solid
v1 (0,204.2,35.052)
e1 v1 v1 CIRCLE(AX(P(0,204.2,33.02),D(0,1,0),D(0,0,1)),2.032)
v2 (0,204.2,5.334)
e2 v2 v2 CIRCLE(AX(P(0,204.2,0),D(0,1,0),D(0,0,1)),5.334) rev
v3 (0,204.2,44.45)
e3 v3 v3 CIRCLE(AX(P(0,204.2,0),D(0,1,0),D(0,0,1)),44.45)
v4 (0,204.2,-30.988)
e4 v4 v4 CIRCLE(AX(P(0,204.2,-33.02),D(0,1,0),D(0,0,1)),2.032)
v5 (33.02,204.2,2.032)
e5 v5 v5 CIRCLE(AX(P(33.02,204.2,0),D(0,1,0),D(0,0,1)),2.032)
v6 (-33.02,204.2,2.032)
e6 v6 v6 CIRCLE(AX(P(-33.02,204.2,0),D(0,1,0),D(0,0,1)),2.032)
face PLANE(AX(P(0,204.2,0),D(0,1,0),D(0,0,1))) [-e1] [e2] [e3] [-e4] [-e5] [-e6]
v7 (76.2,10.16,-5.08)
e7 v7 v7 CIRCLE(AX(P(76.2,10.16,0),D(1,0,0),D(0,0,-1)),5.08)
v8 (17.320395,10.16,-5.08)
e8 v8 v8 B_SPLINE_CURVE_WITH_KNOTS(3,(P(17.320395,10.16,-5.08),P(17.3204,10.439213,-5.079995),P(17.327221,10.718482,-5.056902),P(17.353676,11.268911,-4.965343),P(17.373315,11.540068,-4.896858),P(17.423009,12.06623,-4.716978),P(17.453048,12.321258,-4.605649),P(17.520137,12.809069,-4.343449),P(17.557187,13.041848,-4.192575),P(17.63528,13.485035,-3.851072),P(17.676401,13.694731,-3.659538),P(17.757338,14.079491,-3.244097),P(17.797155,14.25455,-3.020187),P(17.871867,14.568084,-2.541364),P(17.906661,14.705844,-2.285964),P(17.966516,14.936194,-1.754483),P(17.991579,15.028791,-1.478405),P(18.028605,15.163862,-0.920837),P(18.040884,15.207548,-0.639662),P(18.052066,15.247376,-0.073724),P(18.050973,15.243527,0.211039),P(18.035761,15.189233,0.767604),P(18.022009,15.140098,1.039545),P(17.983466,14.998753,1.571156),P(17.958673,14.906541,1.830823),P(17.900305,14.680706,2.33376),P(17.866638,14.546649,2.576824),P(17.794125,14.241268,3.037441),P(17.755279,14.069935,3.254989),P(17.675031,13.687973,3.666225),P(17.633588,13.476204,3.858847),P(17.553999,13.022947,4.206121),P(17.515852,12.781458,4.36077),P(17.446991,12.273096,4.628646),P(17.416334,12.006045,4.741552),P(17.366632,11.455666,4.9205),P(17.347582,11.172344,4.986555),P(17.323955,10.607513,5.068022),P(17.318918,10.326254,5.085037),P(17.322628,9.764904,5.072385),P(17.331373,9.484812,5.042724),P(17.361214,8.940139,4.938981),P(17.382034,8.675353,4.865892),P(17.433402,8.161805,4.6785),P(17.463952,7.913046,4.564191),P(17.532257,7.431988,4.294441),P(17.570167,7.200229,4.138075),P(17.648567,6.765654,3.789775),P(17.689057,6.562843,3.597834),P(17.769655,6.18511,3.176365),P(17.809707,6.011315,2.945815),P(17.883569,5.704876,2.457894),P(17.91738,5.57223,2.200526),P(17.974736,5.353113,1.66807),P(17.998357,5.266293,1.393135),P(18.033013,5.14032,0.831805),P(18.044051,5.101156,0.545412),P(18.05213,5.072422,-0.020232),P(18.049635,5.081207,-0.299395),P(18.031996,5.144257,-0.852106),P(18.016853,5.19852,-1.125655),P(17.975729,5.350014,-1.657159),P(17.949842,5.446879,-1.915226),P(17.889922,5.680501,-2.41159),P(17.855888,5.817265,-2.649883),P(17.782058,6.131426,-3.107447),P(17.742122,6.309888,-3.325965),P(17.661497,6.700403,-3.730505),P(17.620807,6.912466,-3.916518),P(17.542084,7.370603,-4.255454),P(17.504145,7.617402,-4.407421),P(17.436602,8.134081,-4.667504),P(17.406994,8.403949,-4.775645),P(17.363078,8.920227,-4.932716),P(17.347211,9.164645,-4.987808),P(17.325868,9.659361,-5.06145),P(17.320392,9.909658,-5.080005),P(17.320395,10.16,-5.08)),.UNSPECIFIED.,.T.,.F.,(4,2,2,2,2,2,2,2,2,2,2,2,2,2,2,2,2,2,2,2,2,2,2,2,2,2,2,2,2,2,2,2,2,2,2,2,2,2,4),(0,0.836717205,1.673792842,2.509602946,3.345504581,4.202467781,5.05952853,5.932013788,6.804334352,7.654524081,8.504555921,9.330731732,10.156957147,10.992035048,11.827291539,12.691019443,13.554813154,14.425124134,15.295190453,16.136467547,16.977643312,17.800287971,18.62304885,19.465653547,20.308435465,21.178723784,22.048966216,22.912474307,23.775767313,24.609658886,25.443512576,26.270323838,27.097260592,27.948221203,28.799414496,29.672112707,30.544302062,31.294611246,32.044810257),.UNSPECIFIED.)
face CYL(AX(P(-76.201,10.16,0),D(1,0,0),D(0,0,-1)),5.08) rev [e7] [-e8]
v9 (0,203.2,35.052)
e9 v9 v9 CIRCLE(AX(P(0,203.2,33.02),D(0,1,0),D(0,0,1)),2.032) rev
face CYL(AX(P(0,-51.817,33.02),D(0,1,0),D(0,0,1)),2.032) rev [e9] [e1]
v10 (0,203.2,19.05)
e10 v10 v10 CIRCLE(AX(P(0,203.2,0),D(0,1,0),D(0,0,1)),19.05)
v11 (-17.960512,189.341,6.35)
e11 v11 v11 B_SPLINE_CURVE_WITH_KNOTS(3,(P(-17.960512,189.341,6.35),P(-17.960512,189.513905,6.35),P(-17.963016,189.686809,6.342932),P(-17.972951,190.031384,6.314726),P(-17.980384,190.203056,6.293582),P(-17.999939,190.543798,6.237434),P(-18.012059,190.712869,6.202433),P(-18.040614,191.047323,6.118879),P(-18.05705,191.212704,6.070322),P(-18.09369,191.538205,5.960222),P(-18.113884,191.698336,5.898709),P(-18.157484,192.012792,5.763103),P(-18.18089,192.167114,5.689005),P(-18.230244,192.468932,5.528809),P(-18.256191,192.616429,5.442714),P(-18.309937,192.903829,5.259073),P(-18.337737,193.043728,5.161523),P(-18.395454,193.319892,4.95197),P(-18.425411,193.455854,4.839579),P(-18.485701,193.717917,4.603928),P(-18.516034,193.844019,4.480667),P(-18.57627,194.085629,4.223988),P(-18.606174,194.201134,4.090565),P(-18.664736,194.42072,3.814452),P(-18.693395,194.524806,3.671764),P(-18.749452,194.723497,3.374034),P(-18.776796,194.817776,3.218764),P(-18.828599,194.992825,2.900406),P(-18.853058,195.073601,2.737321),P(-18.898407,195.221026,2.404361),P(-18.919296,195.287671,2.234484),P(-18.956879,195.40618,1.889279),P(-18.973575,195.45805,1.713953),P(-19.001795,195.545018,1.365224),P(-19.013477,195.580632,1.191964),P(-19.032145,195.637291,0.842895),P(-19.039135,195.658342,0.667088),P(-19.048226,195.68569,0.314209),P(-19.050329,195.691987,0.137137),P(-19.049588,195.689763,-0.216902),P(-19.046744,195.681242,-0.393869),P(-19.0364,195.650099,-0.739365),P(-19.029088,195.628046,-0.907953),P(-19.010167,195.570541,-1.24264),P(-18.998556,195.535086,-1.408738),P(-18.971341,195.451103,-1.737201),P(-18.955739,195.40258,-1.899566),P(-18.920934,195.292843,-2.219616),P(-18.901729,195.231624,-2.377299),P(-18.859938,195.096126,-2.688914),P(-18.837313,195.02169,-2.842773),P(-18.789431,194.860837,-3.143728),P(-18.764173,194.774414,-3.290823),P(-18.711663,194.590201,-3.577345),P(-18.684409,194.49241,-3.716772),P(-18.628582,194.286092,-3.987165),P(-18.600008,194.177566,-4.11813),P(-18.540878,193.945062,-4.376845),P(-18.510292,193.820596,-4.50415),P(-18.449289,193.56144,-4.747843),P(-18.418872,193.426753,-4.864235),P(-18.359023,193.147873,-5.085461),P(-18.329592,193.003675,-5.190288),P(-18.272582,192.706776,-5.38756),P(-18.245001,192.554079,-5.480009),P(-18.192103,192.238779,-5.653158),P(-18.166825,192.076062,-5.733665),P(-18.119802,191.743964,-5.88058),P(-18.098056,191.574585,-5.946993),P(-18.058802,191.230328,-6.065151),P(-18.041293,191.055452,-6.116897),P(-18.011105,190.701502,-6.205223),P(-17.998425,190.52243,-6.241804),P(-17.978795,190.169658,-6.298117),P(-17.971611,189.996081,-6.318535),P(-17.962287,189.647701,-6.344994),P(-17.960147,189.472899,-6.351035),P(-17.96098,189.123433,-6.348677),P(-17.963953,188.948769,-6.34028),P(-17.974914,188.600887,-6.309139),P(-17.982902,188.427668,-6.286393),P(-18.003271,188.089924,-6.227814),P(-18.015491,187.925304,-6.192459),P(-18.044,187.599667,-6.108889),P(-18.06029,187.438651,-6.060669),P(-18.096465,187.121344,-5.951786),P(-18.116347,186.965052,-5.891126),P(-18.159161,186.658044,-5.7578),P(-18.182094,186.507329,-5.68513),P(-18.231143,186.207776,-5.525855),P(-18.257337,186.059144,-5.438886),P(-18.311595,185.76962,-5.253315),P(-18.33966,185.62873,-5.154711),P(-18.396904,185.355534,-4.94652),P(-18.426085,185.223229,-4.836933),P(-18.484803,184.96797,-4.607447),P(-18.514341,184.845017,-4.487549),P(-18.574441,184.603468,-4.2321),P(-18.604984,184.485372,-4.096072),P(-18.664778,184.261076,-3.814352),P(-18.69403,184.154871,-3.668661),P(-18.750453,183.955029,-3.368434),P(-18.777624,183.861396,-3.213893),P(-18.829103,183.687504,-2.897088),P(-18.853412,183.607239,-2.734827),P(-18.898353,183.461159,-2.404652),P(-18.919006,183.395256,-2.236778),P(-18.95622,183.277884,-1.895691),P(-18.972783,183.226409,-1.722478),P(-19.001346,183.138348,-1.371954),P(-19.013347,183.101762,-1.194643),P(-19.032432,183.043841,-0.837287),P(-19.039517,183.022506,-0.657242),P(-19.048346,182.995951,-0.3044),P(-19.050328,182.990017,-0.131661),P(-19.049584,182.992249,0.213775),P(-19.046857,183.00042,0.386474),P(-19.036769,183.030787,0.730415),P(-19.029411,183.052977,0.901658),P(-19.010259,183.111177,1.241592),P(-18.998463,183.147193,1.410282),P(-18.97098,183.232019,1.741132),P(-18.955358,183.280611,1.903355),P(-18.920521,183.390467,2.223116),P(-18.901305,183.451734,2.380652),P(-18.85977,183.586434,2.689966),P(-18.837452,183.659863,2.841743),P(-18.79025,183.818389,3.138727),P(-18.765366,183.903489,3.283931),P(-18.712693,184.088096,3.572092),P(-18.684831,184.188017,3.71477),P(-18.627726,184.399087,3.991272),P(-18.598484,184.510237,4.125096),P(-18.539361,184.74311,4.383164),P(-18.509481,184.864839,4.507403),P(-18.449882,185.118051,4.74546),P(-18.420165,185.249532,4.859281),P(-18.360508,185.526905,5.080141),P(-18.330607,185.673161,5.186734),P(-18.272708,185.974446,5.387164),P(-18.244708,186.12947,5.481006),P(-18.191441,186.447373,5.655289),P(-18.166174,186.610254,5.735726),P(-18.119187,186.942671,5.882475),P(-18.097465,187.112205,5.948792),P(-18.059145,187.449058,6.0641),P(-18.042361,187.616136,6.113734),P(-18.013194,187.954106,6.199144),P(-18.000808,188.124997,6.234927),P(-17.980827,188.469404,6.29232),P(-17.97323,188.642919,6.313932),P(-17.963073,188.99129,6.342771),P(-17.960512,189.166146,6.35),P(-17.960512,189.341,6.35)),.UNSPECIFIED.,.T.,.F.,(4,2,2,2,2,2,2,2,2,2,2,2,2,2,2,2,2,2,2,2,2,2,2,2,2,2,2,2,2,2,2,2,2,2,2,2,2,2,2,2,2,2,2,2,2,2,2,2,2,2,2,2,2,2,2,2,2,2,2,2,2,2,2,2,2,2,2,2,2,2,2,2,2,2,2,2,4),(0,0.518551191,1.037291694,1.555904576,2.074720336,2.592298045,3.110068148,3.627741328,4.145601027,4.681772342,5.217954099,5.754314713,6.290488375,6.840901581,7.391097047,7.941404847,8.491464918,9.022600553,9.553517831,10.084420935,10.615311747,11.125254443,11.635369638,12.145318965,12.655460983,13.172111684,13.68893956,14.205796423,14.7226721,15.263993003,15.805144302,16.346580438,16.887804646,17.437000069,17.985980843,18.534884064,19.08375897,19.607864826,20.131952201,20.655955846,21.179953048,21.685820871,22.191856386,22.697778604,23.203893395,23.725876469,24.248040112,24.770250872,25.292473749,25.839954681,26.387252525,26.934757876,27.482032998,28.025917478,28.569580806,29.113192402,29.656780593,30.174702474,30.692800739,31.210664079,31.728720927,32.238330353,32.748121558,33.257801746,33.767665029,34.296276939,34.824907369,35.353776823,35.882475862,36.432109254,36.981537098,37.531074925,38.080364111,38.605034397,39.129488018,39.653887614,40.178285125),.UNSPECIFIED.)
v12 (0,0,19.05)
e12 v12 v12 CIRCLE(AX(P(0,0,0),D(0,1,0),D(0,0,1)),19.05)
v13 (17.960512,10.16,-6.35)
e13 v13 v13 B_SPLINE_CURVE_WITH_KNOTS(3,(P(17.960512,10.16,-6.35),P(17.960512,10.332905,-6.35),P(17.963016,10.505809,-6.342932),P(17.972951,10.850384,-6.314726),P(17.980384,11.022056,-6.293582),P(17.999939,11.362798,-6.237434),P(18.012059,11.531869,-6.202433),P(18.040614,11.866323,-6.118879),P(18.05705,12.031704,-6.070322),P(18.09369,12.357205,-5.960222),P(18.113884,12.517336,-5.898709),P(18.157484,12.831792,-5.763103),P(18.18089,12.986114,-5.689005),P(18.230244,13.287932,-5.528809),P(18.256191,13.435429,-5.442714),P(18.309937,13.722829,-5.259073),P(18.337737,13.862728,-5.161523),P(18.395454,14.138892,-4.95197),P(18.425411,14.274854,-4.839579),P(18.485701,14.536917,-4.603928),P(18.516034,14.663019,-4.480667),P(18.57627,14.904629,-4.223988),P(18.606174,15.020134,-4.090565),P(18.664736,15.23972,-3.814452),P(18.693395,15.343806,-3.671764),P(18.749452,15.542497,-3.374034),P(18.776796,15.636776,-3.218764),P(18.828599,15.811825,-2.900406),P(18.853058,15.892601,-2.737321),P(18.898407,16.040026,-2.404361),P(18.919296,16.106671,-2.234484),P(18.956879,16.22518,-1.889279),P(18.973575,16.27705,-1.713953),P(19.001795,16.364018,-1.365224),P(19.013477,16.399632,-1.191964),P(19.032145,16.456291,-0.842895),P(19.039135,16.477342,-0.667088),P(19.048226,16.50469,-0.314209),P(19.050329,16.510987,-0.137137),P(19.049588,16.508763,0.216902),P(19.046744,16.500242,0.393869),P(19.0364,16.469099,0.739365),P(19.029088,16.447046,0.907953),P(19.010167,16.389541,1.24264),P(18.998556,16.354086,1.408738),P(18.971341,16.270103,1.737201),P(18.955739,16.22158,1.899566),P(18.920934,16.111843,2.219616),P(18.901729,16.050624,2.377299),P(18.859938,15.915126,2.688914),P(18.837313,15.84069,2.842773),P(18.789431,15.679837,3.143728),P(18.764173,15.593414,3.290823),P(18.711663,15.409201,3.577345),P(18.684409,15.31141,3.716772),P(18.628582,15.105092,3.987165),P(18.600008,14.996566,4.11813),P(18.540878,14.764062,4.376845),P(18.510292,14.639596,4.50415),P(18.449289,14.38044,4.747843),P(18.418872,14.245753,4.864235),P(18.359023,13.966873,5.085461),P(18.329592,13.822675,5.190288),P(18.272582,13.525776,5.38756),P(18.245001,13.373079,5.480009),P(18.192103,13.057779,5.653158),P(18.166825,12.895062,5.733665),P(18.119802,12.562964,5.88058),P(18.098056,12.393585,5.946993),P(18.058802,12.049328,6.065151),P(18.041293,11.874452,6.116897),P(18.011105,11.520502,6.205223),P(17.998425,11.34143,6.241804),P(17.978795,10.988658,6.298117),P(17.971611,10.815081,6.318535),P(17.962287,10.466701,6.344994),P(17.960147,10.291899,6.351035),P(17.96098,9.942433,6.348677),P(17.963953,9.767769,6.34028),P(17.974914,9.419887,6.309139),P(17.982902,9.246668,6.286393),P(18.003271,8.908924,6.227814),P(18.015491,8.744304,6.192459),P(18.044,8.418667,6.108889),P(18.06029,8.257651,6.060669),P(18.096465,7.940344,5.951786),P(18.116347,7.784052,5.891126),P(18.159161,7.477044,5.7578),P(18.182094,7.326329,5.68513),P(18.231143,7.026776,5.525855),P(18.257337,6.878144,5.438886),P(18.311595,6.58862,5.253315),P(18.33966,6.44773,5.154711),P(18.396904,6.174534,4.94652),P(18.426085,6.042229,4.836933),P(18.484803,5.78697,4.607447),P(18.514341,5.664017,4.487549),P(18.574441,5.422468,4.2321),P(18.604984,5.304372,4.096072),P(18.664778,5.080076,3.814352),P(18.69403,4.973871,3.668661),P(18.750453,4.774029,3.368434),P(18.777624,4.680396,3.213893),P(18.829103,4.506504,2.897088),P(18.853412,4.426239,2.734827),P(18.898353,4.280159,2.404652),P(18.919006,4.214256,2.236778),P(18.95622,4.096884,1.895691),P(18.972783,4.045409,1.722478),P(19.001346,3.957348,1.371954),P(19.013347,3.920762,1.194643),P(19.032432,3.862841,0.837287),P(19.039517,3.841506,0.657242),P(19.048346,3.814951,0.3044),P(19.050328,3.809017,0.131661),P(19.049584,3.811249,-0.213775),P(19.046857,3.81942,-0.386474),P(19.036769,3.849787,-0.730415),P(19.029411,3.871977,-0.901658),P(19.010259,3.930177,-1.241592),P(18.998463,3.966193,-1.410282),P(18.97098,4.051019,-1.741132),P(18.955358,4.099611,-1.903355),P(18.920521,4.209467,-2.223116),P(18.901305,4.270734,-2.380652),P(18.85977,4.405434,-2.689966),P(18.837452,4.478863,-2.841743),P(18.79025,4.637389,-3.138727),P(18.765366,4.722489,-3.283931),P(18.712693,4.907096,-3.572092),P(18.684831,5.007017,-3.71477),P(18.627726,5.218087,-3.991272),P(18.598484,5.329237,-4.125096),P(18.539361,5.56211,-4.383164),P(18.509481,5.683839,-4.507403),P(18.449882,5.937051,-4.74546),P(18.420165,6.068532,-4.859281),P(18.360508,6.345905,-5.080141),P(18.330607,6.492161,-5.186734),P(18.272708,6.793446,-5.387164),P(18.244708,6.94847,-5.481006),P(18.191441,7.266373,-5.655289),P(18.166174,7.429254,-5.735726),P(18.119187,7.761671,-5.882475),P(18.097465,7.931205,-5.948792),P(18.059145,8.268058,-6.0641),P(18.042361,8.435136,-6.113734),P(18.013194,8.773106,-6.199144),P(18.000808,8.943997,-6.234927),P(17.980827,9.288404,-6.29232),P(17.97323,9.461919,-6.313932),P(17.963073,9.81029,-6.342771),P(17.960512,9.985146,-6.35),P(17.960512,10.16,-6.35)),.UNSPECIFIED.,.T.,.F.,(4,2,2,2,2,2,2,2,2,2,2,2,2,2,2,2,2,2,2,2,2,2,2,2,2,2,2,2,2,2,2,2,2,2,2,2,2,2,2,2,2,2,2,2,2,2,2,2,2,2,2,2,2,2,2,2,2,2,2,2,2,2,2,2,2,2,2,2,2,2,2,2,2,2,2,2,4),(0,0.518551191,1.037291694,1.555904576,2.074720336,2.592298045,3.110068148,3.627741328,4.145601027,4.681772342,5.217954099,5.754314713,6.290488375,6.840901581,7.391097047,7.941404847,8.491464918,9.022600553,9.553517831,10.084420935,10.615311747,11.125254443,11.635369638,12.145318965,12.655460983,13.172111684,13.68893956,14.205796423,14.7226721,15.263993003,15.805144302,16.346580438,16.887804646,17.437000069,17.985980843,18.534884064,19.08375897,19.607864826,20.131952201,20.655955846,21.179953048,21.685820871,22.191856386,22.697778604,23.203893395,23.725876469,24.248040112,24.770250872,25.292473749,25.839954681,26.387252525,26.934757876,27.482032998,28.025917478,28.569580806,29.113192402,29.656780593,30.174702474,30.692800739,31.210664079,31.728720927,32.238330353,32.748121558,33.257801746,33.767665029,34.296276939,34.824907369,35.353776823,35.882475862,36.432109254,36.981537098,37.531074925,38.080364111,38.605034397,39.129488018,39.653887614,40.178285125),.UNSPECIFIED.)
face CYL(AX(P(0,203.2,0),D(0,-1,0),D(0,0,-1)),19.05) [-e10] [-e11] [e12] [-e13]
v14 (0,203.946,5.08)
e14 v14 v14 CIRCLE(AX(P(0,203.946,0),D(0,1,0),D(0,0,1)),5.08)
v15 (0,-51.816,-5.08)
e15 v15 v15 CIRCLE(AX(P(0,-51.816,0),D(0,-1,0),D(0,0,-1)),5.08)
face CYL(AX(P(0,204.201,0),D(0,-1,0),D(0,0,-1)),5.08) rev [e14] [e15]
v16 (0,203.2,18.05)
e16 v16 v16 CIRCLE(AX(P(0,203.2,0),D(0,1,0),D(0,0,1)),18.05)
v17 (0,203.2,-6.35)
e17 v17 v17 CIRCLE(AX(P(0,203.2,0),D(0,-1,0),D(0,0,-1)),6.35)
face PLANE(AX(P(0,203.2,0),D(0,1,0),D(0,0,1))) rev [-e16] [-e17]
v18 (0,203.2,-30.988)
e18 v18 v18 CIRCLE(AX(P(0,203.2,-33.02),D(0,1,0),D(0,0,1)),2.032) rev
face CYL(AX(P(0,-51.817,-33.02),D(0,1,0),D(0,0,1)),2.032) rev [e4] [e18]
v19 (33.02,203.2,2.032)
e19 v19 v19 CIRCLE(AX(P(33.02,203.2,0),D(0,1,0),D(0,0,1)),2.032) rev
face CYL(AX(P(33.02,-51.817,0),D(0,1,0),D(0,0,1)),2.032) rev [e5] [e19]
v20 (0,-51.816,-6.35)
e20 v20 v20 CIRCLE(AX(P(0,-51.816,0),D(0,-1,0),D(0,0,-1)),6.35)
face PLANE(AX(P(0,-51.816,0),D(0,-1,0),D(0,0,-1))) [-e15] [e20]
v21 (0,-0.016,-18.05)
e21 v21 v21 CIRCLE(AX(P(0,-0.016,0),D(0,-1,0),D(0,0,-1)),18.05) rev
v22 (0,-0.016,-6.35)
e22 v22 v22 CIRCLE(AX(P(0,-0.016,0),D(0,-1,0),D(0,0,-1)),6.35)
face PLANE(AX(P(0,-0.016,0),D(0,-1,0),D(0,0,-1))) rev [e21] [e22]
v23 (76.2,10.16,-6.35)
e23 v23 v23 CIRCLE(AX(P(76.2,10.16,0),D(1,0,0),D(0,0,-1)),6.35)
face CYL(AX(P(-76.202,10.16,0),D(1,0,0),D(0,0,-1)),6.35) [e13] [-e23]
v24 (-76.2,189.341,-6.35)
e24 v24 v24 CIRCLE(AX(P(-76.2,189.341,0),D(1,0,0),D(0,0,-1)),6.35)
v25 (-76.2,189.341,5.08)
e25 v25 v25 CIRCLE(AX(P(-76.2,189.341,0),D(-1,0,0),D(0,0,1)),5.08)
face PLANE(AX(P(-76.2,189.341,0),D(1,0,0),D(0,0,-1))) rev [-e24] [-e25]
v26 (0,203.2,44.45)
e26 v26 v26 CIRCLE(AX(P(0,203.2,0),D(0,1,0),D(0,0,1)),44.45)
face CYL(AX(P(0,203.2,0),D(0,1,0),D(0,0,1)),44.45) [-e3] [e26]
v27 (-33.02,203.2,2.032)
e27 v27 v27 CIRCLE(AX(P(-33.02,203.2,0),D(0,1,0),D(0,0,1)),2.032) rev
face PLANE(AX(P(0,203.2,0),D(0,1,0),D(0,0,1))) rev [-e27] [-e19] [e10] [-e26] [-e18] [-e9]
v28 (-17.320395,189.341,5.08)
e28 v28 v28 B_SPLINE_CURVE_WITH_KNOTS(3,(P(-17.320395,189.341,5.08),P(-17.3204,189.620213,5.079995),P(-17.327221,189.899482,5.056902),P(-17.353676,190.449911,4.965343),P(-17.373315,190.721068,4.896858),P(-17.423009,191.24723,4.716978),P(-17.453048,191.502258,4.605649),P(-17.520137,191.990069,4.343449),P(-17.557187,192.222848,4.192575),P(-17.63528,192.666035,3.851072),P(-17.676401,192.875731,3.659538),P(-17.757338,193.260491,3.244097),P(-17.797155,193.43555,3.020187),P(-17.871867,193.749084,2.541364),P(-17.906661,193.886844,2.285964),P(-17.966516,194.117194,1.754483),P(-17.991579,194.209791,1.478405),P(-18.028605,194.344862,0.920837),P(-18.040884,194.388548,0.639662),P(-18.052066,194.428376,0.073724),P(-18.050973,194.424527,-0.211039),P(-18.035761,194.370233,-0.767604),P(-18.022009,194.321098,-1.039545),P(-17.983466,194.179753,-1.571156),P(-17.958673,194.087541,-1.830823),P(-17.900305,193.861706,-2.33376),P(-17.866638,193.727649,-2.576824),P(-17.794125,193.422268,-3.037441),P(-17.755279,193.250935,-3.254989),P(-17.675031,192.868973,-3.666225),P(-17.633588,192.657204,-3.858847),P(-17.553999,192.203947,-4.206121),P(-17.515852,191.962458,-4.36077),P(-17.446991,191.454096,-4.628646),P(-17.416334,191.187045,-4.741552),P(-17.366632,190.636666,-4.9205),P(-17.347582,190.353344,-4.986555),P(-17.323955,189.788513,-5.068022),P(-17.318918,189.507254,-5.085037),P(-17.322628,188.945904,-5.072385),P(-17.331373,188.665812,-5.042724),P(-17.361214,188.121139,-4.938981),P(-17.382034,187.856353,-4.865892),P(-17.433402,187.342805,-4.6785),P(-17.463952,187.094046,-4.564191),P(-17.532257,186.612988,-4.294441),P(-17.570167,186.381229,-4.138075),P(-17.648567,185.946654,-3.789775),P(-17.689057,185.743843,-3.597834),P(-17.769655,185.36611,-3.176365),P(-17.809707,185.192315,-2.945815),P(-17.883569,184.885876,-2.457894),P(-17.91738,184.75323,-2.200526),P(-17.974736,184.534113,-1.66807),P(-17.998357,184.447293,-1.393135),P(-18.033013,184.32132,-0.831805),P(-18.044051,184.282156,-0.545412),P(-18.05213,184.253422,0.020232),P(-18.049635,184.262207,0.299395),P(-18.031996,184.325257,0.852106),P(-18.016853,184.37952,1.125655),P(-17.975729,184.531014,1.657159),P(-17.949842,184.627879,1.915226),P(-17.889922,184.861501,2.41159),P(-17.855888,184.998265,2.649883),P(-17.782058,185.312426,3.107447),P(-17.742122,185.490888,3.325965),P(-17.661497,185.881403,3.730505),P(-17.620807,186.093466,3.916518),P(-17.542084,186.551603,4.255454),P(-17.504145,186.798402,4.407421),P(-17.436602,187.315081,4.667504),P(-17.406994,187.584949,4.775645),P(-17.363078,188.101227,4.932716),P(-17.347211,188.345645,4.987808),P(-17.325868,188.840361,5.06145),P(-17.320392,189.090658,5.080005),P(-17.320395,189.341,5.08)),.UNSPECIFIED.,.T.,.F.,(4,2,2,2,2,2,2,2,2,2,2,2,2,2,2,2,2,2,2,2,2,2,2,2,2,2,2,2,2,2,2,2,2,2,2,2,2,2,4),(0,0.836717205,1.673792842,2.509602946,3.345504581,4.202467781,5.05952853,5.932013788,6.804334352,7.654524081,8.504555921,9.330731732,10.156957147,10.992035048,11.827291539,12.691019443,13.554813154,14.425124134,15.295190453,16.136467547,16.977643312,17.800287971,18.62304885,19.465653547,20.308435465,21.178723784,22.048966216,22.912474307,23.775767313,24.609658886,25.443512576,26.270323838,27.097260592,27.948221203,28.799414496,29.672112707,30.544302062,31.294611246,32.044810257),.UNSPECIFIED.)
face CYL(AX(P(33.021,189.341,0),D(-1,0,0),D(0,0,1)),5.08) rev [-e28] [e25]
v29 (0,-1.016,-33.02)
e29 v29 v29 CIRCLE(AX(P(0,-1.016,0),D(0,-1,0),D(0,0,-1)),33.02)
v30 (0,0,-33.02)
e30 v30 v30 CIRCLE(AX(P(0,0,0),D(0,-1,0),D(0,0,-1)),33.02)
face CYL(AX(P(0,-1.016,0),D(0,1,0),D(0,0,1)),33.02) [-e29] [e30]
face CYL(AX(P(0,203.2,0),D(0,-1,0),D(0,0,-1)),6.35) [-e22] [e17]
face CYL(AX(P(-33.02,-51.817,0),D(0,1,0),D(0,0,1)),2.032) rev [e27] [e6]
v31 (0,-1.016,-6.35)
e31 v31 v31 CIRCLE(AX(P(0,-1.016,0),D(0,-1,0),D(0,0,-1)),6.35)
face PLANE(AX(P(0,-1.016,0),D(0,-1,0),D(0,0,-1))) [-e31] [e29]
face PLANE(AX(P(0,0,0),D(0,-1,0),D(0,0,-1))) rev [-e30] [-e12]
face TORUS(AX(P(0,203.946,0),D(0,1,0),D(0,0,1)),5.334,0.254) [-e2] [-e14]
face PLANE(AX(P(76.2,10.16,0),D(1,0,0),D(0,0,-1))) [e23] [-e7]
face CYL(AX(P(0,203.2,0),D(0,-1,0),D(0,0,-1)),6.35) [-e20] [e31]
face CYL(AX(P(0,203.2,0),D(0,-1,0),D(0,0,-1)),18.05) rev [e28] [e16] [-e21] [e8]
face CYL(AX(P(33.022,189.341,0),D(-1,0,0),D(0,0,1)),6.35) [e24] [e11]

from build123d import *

# Parameters (mm, degrees)
SKETCH1_R                = 19.05
BOSS_EXTRUDE1_DEPTH      = 203.2
SKETCH2_R                = 33.02
BOSS_EXTRUDE2_DEPTH      = 1
BOSS_EXTRUDE3_START      = 1.016
SKETCH3_R                = 33.02
BOSS_EXTRUDE3_DEPTH      = 1.016
SHELL2_START             = -0.016
SHELL2_OUTLINE_R         = 18.05
SHELL2_DEPTH             = 204.216
BOSS_EXTRUDE4_REACH      = 235.917
BOSS_EXTRUDE4_END_RADIUS = 19.05
SKETCH4_R                = 6.35
CUT_EXTRUDE1_REACH       = 235.917
CUT_EXTRUDE1_END_RADIUS  = 18.05
SKETCH5_R                = 5.08
BOSS_EXTRUDE5_REACH      = 258.931
BOSS_EXTRUDE5_END_RADIUS = 19.05
SKETCH6_R                = 6.35
CUT_EXTRUDE3_REACH       = 223.383
SKETCH8_R                = 4
BOSS_EXTRUDE6_START      = 50.8
SKETCH9_R                = 6.35
BOSS_EXTRUDE6_DEPTH      = 255.016
CUT_EXTRUDE2_REACH       = 258.931
CUT_EXTRUDE2_END_RADIUS  = 18.05
SKETCH7_R                = 5.08
SKETCH11_R               = 44.45
BOSS_EXTRUDE7_DEPTH      = 1
CUT_EXTRUDE5_REACH       = 272.789
SKETCH13_R               = 2.032
CUT_EXTRUDE6_REACH       = 272.789
SKETCH15_R               = 5.08
FILLET1_R                = 0.254


# Read off the part's stored shape, not the designer's step: Shell2
with BuildPart() as part:
    # Sketch1 → Boss-Extrude1 (new body)
    with BuildSketch(Plane(origin=(0, 0, 0), x_dir=(1, 0, 0), z_dir=(0, 1, 0))):
        with Locations(Location((0, 0, 0), (0, 0, 270))):
            Circle(SKETCH1_R)
    extrude(amount=BOSS_EXTRUDE1_DEPTH)

    # Sketch2 → Boss-Extrude2 (add)
    with BuildSketch(Plane(origin=(0, 203.2, 0), x_dir=(1, 0, 0), z_dir=(0, 1, 0))):
        with Locations(Location((0, 0, 0), (0, 0, 270))):
            Circle(SKETCH2_R)
    extrude(amount=BOSS_EXTRUDE2_DEPTH)

    # Sketch3 → Boss-Extrude3 (add)
    with BuildSketch(Plane.XZ.offset(BOSS_EXTRUDE3_START)):
        with Locations(Location((0, 0, 0), (0, 0, 90))):
            Circle(SKETCH3_R)
    extrude(amount=-BOSS_EXTRUDE3_DEPTH)

    # Shell2 outline → Shell2 (cut)
    with BuildSketch(Plane(origin=(0, 0, 0), x_dir=(1, 0, 0), z_dir=(0, 1, 0)).offset(SHELL2_START)):
        Circle(SHELL2_OUTLINE_R)
    extrude(amount=SHELL2_DEPTH, mode=Mode.SUBTRACT)

    # Boss-Extrude4: up to this cylinder (the profile starts outside it)
    boss_extrude4_end = Plane(origin=(0, 189.341, 0), z_dir=(0, -1, 0)) * Cylinder(BOSS_EXTRUDE4_END_RADIUS, 510.934, mode=Mode.PRIVATE)
    # Sketch4 → Boss-Extrude4 (add, up to the surface)
    with BuildSketch(Plane(origin=(-76.2, 0, 0), x_dir=(0, 0, -1), z_dir=(1, 0, 0)), mode=Mode.PRIVATE) as boss_extrude4_sk1:
        with Locations(Location((0, 189.341, 0), (0, 0, 180))):
            Circle(SKETCH4_R)
    boss_extrude4_tool1 = extrude(boss_extrude4_sk1.sketch, amount=BOSS_EXTRUDE4_REACH, mode=Mode.PRIVATE) - boss_extrude4_end
    add(boss_extrude4_tool1.solids().sort_by_distance((-76.2, 189.341, 0))[0])

    # Cut-Extrude1: up to this cylinder (the profile starts outside it)
    cut_extrude1_end = Plane(origin=(0, 189.341, 0), z_dir=(0, -1, 0)) * Cylinder(CUT_EXTRUDE1_END_RADIUS, 508.934, mode=Mode.PRIVATE)
    # Sketch5 → Cut-Extrude1 (cut, up to the surface)
    with BuildSketch(Plane.ZY.offset(76.2), mode=Mode.PRIVATE) as cut_extrude1_sk1:
        with Locations((0, 189.341)):
            Circle(SKETCH5_R)
    cut_extrude1_tool1 = extrude(cut_extrude1_sk1.sketch, amount=-CUT_EXTRUDE1_REACH, mode=Mode.PRIVATE) - cut_extrude1_end
    add(cut_extrude1_tool1.solids().sort_by_distance((-76.2, 189.341, 0))[0], mode=Mode.SUBTRACT)

    # Boss-Extrude5: up to this cylinder (the profile starts outside it)
    boss_extrude5_end = Plane(origin=(0, 10.16, 0), z_dir=(0, -1, 0)) * Cylinder(BOSS_EXTRUDE5_END_RADIUS, 556.962, mode=Mode.PRIVATE)
    # Sketch6 → Boss-Extrude5 (add, up to the surface)
    with BuildSketch(Plane(origin=(76.2, 0, 0), x_dir=(0, 0, -1), z_dir=(1, 0, 0)), mode=Mode.PRIVATE) as boss_extrude5_sk1:
        with Locations((0, 10.16)):
            Circle(SKETCH6_R)
    boss_extrude5_tool1 = extrude(boss_extrude5_sk1.sketch, amount=-BOSS_EXTRUDE5_REACH, mode=Mode.PRIVATE) - boss_extrude5_end
    add(boss_extrude5_tool1.solids().sort_by_distance((76.2, 10.16, 0))[0])

    # Sketch8 → Cut-Extrude3 (cut, up to next)
    with BuildSketch(Plane.XZ.offset(1.016), mode=Mode.PRIVATE) as cut_extrude3_sk1:
        with Locations(Location((0, 0, 0), (0, 0, 270))):
            Circle(SKETCH8_R)
    cut_extrude3_tool1 = extrude(cut_extrude3_sk1.sketch, amount=-CUT_EXTRUDE3_REACH, mode=Mode.PRIVATE) & part.part
    add(cut_extrude3_tool1.solids().sort_by_distance((0, -1.016, 0))[0], mode=Mode.SUBTRACT)

    # Sketch9 → Boss-Extrude6 (add)
    with BuildSketch(Plane.XZ.offset(1.016).offset(BOSS_EXTRUDE6_START)):
        with Locations(Location((0, 0, 0), (0, 0, 270))):
            Circle(SKETCH9_R)
    extrude(amount=-BOSS_EXTRUDE6_DEPTH)

    # Cut-Extrude2: up to this cylinder (the profile starts outside it)
    cut_extrude2_end = Plane(origin=(0, 10.16, 0), z_dir=(0, -1, 0)) * Cylinder(CUT_EXTRUDE2_END_RADIUS, 554.962, mode=Mode.PRIVATE)
    # Sketch7 → Cut-Extrude2 (cut, up to the surface)
    with BuildSketch(Plane(origin=(76.2, 0, 0), x_dir=(0, 0, -1), z_dir=(1, 0, 0)), mode=Mode.PRIVATE) as cut_extrude2_sk1:
        with Locations((0, 10.16)):
            Circle(SKETCH7_R)
    cut_extrude2_tool1 = extrude(cut_extrude2_sk1.sketch, amount=-CUT_EXTRUDE2_REACH, mode=Mode.PRIVATE) - cut_extrude2_end
    add(cut_extrude2_tool1.solids().sort_by_distance((76.2, 10.16, 0))[0], mode=Mode.SUBTRACT)

    # Sketch11 → Boss-Extrude7 (add)
    with BuildSketch(Plane(origin=(0, 204.2, 0), x_dir=(1, 0, 0), z_dir=(0, 1, 0))):
        with Locations(Location((0, 0, 0), (0, 0, 270))):
            Circle(SKETCH11_R)
    extrude(amount=-BOSS_EXTRUDE7_DEPTH)

    # Sketch13 → Cut-Extrude5 (cut, up to next)
    with BuildSketch(Plane(origin=(0, 204.2, 0), x_dir=(1, 0, 0), z_dir=(0, 1, 0)), mode=Mode.PRIVATE) as cut_extrude5_sk1:
        with Locations(Location((33.02, 0, 0), (0, 0, 270))):
            Circle(SKETCH13_R)
    cut_extrude5_tool1 = extrude(cut_extrude5_sk1.sketch, amount=-CUT_EXTRUDE5_REACH, mode=Mode.PRIVATE) & part.part
    # Sketch13 → Cut-Extrude5 (cut, up to next)
    with BuildSketch(Plane(origin=(0, 204.2, 0), x_dir=(1, 0, 0), z_dir=(0, 1, 0)), mode=Mode.PRIVATE) as cut_extrude5_sk2:
        with Locations(Location((0, -33.02, 0), (0, 0, 270))):
            Circle(SKETCH13_R)
    cut_extrude5_tool2 = extrude(cut_extrude5_sk2.sketch, amount=-CUT_EXTRUDE5_REACH, mode=Mode.PRIVATE) & part.part
    # Sketch13 → Cut-Extrude5 (cut, up to next)
    with BuildSketch(Plane(origin=(0, 204.2, 0), x_dir=(1, 0, 0), z_dir=(0, 1, 0)), mode=Mode.PRIVATE) as cut_extrude5_sk3:
        with Locations(Location((-33.02, 0, 0), (0, 0, 270))):
            Circle(SKETCH13_R)
    cut_extrude5_tool3 = extrude(cut_extrude5_sk3.sketch, amount=-CUT_EXTRUDE5_REACH, mode=Mode.PRIVATE) & part.part
    # Sketch13 → Cut-Extrude5 (cut, up to next)
    with BuildSketch(Plane(origin=(0, 204.2, 0), x_dir=(1, 0, 0), z_dir=(0, 1, 0)), mode=Mode.PRIVATE) as cut_extrude5_sk4:
        with Locations(Location((0, 33.02, 0), (0, 0, 270))):
            Circle(SKETCH13_R)
    cut_extrude5_tool4 = extrude(cut_extrude5_sk4.sketch, amount=-CUT_EXTRUDE5_REACH, mode=Mode.PRIVATE) & part.part
    add(cut_extrude5_tool1.solids().sort_by_distance((33.02, 204.2, 0))[0], mode=Mode.SUBTRACT)
    add(cut_extrude5_tool2.solids().sort_by_distance((0, 204.2, 33.02))[0], mode=Mode.SUBTRACT)
    add(cut_extrude5_tool3.solids().sort_by_distance((-33.02, 204.2, 0))[0], mode=Mode.SUBTRACT)
    add(cut_extrude5_tool4.solids().sort_by_distance((0, 204.2, -33.02))[0], mode=Mode.SUBTRACT)

    # Sketch15 → Cut-Extrude6 (cut, up to next)
    with BuildSketch(Plane.XZ.offset(51.816), mode=Mode.PRIVATE) as cut_extrude6_sk1:
        with Locations(Location((0, 0, 0), (0, 0, 270))):
            Circle(SKETCH15_R)
    cut_extrude6_tool1 = extrude(cut_extrude6_sk1.sketch, amount=-CUT_EXTRUDE6_REACH, mode=Mode.PRIVATE) & part.part
    add(cut_extrude6_tool1.solids().sort_by_distance((0, -51.816, 0))[0], mode=Mode.SUBTRACT)

    # Fillet1
    fillet1_edges = [part.edges().sort_by_distance(p)[0] for p in [
        (0, 204.2, 5.08),
    ]]
    fillet(fillet1_edges, radius=FILLET1_R)


solid = part.part
